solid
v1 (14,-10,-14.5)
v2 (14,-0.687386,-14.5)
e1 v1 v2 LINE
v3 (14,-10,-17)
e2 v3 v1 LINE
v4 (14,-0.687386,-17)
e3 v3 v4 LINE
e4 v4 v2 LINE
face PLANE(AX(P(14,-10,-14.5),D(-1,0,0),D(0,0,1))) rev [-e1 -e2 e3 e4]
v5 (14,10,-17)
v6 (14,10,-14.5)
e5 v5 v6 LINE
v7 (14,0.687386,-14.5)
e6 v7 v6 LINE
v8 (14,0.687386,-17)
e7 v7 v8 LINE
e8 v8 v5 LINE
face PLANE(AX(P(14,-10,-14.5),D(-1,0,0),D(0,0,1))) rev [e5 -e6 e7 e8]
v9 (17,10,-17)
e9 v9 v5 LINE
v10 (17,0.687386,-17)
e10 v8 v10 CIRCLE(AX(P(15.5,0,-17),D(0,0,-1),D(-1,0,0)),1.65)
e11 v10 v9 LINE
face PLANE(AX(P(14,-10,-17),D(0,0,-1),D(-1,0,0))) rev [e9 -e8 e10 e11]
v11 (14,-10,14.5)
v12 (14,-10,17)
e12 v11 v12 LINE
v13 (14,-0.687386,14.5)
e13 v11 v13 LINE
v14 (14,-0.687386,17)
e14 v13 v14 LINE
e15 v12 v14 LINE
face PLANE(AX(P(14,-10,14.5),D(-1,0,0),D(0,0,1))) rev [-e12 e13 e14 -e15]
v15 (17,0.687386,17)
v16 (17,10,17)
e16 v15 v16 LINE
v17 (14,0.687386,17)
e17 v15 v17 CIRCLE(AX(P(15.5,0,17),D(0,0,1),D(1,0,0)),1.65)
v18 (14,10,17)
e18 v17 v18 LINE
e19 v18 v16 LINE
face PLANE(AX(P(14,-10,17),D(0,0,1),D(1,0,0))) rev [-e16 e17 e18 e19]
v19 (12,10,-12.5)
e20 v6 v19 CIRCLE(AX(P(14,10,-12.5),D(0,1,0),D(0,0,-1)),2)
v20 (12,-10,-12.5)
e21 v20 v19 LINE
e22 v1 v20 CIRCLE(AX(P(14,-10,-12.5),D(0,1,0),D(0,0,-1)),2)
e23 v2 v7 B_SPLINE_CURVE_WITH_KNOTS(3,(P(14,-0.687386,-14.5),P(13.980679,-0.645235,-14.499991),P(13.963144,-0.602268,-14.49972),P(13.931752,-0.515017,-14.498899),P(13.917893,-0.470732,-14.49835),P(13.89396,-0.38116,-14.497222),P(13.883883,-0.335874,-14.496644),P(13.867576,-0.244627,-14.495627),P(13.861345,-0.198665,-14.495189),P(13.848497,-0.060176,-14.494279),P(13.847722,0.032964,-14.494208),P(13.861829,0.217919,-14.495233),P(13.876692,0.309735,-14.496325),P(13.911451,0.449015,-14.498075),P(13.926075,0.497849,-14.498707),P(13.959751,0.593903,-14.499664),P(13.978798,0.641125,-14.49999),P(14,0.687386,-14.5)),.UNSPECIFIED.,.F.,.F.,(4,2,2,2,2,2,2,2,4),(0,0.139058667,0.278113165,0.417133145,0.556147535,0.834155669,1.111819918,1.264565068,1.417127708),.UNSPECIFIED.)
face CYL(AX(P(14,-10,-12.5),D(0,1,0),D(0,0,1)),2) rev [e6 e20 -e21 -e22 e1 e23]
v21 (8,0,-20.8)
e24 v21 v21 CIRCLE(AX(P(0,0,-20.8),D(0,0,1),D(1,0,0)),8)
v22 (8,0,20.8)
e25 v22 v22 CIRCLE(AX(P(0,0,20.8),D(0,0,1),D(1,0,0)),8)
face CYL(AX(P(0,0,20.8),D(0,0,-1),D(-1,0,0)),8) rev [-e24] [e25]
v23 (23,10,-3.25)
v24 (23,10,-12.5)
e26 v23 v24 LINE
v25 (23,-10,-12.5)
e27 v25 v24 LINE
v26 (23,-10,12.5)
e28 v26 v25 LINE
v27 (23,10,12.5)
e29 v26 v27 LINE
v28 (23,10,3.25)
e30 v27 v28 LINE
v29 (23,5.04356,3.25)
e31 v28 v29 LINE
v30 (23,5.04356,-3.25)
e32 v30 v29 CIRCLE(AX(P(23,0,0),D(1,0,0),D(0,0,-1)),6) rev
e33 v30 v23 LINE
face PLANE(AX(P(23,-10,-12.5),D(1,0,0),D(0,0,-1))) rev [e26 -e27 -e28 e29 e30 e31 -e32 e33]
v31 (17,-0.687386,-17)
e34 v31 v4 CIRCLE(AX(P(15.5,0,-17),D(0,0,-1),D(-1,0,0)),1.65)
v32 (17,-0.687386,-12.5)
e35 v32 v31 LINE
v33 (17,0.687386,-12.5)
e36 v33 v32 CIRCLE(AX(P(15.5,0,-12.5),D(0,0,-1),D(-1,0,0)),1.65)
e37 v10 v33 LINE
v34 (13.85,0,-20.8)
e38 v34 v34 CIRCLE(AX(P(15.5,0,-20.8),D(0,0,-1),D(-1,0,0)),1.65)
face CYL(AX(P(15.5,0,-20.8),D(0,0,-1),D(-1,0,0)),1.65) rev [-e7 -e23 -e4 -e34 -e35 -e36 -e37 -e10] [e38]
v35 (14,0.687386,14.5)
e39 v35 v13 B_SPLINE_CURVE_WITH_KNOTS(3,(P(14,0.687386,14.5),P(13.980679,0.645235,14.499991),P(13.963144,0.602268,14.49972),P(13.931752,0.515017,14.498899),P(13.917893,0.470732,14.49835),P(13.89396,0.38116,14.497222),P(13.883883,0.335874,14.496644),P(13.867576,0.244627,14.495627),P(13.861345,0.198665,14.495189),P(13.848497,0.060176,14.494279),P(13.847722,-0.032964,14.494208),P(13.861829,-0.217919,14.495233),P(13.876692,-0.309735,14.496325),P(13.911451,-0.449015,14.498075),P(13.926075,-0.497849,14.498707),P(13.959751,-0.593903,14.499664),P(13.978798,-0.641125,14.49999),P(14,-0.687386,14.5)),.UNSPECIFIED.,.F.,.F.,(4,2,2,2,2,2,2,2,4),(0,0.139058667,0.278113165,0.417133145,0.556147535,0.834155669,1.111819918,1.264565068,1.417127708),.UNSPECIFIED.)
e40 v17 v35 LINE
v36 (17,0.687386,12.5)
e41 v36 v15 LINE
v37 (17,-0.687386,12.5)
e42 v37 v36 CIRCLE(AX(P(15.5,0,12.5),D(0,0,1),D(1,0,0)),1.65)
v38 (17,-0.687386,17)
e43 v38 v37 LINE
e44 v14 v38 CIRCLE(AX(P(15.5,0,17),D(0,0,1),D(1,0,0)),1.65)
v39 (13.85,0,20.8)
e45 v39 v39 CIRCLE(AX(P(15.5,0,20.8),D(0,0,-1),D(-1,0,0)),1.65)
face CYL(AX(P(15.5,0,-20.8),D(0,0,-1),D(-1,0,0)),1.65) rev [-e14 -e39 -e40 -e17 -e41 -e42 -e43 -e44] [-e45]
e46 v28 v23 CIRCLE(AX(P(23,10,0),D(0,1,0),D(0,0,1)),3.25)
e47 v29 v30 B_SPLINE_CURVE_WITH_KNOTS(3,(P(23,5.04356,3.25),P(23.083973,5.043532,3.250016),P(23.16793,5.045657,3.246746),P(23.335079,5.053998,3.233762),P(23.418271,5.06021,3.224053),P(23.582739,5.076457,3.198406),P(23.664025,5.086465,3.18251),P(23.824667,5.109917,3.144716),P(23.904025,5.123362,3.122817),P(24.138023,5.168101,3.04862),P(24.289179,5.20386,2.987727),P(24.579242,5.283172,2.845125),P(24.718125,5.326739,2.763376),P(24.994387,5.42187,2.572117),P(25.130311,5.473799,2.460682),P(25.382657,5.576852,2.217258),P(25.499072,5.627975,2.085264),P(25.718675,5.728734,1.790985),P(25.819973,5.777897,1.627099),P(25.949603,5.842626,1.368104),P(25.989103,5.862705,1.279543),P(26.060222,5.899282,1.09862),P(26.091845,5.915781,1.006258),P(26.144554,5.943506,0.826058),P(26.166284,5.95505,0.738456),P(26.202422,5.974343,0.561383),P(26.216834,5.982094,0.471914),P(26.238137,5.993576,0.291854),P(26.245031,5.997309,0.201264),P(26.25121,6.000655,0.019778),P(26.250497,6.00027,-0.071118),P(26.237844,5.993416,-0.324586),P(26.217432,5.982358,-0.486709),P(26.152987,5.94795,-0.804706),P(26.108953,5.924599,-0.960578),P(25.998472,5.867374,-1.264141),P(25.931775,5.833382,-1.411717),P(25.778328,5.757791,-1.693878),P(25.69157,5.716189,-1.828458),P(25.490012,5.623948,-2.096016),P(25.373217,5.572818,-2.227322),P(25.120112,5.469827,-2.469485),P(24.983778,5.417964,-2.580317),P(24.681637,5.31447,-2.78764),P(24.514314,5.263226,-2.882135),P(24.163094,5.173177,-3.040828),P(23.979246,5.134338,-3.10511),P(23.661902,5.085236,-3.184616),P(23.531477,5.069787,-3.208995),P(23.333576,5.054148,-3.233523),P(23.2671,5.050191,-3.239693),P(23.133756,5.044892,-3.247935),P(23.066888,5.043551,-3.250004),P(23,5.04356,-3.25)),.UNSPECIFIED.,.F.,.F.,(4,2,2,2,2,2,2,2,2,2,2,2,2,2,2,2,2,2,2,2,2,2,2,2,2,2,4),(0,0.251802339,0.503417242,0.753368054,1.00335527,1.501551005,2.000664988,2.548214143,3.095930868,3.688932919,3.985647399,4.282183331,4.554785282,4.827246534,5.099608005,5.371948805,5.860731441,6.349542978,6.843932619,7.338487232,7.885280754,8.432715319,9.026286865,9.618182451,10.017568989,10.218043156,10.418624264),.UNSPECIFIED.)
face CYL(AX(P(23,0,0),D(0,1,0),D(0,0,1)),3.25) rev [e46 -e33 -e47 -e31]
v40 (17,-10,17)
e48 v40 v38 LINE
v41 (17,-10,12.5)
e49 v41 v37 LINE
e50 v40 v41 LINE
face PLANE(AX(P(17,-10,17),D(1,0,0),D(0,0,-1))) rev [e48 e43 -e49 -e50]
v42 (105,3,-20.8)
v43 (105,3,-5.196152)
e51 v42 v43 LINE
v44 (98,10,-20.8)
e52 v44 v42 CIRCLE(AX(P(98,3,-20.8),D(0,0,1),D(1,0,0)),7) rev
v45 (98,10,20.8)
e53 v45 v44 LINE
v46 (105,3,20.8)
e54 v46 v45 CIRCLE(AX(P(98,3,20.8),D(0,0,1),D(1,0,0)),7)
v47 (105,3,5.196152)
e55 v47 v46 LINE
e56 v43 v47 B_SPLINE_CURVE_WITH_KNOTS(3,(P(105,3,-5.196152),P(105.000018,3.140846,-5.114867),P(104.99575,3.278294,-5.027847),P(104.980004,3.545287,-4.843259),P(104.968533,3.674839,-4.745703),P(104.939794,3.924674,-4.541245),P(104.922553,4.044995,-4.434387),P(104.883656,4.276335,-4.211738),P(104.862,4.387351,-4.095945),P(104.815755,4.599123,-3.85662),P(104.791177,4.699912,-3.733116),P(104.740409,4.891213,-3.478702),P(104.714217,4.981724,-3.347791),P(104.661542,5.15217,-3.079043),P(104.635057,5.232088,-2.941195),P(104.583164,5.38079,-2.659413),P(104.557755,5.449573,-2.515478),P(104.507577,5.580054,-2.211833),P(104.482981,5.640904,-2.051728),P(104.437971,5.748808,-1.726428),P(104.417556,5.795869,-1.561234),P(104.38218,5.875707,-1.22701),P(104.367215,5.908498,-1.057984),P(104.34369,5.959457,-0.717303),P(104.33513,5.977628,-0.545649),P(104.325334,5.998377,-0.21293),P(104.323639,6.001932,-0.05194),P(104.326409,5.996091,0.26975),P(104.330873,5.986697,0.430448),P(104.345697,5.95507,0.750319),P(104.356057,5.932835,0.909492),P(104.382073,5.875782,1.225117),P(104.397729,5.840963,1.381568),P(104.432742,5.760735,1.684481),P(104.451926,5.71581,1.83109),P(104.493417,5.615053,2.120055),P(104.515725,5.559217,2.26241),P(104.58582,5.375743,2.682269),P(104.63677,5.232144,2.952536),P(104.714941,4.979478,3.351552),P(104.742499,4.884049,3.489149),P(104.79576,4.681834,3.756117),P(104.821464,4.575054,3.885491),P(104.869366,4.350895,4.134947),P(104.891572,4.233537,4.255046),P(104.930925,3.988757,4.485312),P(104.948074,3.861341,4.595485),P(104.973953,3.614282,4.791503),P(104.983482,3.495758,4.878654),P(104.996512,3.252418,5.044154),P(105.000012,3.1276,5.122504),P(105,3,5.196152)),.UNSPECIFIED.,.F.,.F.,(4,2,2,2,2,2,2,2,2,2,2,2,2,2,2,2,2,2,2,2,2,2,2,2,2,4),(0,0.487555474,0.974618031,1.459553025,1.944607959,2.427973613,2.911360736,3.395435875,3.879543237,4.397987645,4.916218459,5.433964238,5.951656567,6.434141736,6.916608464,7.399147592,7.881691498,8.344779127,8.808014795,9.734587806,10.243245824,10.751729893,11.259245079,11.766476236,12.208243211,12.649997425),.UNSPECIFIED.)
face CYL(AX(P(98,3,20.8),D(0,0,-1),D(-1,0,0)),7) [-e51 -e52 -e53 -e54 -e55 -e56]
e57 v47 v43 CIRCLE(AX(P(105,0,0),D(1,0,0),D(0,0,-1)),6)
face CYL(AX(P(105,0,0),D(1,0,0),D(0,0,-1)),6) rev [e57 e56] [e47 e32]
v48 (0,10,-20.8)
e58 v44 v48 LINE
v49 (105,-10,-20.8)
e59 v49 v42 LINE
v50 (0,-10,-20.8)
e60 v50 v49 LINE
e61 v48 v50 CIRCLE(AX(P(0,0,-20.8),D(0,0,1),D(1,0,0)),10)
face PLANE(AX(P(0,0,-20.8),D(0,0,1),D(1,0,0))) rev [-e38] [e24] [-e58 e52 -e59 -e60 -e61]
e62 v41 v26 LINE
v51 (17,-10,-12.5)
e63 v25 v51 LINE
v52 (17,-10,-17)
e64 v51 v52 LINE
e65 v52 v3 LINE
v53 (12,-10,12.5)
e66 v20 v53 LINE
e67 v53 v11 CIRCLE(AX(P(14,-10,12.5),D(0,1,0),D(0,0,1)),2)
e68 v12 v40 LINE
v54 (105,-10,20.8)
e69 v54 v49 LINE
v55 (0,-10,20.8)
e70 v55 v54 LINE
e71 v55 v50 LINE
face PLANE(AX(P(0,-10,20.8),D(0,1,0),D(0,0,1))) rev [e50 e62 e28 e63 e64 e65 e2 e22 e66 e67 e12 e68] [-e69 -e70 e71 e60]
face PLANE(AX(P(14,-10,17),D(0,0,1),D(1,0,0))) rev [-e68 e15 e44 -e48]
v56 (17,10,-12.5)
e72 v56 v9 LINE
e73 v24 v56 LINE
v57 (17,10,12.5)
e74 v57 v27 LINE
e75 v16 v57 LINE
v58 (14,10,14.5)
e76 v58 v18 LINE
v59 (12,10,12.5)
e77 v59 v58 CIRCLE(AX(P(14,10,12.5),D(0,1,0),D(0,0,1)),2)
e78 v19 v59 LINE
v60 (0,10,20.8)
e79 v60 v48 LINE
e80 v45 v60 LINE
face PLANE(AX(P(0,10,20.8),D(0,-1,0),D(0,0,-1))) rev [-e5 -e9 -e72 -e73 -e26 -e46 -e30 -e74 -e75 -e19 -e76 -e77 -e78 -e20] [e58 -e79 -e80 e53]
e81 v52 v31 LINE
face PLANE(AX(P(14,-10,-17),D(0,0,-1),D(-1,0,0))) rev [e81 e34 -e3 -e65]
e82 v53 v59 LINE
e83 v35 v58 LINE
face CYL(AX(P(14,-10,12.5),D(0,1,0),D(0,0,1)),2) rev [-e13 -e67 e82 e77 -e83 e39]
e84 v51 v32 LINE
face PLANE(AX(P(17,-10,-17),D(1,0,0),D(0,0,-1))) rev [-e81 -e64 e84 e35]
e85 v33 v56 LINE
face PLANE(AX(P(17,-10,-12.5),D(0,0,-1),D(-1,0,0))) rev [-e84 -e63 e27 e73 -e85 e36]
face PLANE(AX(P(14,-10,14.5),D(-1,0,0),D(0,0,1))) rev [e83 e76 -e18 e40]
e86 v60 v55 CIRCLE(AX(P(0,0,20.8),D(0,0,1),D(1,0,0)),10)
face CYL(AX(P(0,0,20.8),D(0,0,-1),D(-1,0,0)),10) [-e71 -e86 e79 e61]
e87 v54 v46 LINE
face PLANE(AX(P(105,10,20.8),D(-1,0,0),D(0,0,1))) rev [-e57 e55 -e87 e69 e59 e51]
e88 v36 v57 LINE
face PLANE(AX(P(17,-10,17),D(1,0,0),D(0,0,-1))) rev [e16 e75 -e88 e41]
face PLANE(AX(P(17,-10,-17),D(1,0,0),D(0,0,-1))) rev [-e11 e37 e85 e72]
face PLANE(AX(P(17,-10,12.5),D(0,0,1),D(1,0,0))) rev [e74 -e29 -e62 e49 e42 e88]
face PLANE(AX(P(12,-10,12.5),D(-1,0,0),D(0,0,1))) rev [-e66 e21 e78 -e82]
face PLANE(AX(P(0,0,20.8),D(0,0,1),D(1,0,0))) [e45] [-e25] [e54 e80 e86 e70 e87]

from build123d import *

# Parameters (mm, degrees)
ESQUISSE1_R                         = 8
BOSS_EXTRU_1_DEPTH                  = 20.8
DIAM_TRE_DU_PER_AGE_12_0_12_1_D     = 12
DIAM_TRE_DU_PER_AGE_12_0_12_1_DEPTH = 88
DIAM_TRE_DU_PER_AGE_12_0_12_1_TIP   = 3.605163714
CONG_1_R                            = 7
ENL_V_MAT_EXTRU_1_DEPTH             = 109.892791429
ESQUISSE6_R                         = 3.25
ENL_V_MAT_EXTRU_2_DEPTH             = 10
TROU_TARAUD_M41_D                   = 3.3


with BuildPart() as part:
    # Esquisse1 → Boss.-Extru.1 (new, symmetric)
    with BuildSketch(Plane.XY):
        with BuildLine():
            Line((0, -10), (105, -10))
            Line((105, -10), (105, 10))
            Line((105, 10), (0, 10))
            ThreePointArc((0, 10), (-10, 0), (0, -10))
        make_face()
        Circle(ESQUISSE1_R, mode=Mode.SUBTRACT)
    extrude(amount=BOSS_EXTRU_1_DEPTH, both=True)

    # Diamètre du perçage Ø12.0 (12)1
    with Locations(Plane(origin=(105, 0, 0), x_dir=(0, 0, -1), z_dir=(1, 0, 0))):
        with Locations((0, 0)):
            Hole(DIAM_TRE_DU_PER_AGE_12_0_12_1_D / 2, depth=DIAM_TRE_DU_PER_AGE_12_0_12_1_DEPTH)
            with Locations((0, 0, -(DIAM_TRE_DU_PER_AGE_12_0_12_1_DEPTH + DIAM_TRE_DU_PER_AGE_12_0_12_1_TIP / 2))):  # 118° drill point
                Cone(0, DIAM_TRE_DU_PER_AGE_12_0_12_1_D / 2, DIAM_TRE_DU_PER_AGE_12_0_12_1_TIP, mode=Mode.SUBTRACT)

    # Congé1
    # the kernel refuses this fillet: 7 mm, written as the material it takes off along each edge
    with BuildSketch(Plane(origin=(105, 10, -38.3), x_dir=(0, -1, 0), z_dir=(0, 0, 1))) as cong_1_piece_1:
        with BuildLine():
            CenterArc((CONG_1_R, -CONG_1_R), CONG_1_R, 90, 90)
            Line((0, -CONG_1_R), (0, 0))
            Line((0, 0), (CONG_1_R, 0))
        make_face()
    extrude(amount=76.6, mode=Mode.SUBTRACT)

    # Esquisse5 → Enlèv. mat.-Extru.1 (cut, through all)
    with BuildSketch(Plane(origin=(0, 10, 0), x_dir=(1, 0, 0), z_dir=(0, 1, 0))):
        with BuildLine():
            Line((12, -12.5), (12, 12.5))
            ThreePointArc((12, 12.5), (12.585786438, 13.914213562), (14, 14.5))
            Line((14, 14.5), (14, 17))
            Line((14, 17), (17, 17))
            Line((17, 17), (17, 12.5))
            Line((17, 12.5), (23, 12.5))
            Line((23, 12.5), (23, -12.5))
            Line((23, -12.5), (17, -12.5))
            Line((17, -12.5), (17, -17))
            Line((17, -17), (14, -17))
            Line((14, -17), (14, -14.5))
            ThreePointArc((14, -14.5), (12.585786438, -13.914213562), (12, -12.5))
        make_face()
    extrude(amount=-ENL_V_MAT_EXTRU_1_DEPTH, mode=Mode.SUBTRACT)

    # Esquisse6 → Enlèv. mat.-Extru.2 (cut)
    with BuildSketch(Plane(origin=(0, 10, 0), x_dir=(1, 0, 0), z_dir=(0, 1, 0))):
        with Locations((23, 0)):
            Circle(ESQUISSE6_R)
    extrude(amount=-ENL_V_MAT_EXTRU_2_DEPTH, mode=Mode.SUBTRACT)

    # Trou taraudé M41 (through all)
    with Locations(Plane(origin=(0, 0, -20.8), x_dir=(-1, 0, 0), z_dir=(0, 0, -1))):
        with Locations((-15.5, 0)):
            Hole(TROU_TARAUD_M41_D / 2)


solid = part.part
